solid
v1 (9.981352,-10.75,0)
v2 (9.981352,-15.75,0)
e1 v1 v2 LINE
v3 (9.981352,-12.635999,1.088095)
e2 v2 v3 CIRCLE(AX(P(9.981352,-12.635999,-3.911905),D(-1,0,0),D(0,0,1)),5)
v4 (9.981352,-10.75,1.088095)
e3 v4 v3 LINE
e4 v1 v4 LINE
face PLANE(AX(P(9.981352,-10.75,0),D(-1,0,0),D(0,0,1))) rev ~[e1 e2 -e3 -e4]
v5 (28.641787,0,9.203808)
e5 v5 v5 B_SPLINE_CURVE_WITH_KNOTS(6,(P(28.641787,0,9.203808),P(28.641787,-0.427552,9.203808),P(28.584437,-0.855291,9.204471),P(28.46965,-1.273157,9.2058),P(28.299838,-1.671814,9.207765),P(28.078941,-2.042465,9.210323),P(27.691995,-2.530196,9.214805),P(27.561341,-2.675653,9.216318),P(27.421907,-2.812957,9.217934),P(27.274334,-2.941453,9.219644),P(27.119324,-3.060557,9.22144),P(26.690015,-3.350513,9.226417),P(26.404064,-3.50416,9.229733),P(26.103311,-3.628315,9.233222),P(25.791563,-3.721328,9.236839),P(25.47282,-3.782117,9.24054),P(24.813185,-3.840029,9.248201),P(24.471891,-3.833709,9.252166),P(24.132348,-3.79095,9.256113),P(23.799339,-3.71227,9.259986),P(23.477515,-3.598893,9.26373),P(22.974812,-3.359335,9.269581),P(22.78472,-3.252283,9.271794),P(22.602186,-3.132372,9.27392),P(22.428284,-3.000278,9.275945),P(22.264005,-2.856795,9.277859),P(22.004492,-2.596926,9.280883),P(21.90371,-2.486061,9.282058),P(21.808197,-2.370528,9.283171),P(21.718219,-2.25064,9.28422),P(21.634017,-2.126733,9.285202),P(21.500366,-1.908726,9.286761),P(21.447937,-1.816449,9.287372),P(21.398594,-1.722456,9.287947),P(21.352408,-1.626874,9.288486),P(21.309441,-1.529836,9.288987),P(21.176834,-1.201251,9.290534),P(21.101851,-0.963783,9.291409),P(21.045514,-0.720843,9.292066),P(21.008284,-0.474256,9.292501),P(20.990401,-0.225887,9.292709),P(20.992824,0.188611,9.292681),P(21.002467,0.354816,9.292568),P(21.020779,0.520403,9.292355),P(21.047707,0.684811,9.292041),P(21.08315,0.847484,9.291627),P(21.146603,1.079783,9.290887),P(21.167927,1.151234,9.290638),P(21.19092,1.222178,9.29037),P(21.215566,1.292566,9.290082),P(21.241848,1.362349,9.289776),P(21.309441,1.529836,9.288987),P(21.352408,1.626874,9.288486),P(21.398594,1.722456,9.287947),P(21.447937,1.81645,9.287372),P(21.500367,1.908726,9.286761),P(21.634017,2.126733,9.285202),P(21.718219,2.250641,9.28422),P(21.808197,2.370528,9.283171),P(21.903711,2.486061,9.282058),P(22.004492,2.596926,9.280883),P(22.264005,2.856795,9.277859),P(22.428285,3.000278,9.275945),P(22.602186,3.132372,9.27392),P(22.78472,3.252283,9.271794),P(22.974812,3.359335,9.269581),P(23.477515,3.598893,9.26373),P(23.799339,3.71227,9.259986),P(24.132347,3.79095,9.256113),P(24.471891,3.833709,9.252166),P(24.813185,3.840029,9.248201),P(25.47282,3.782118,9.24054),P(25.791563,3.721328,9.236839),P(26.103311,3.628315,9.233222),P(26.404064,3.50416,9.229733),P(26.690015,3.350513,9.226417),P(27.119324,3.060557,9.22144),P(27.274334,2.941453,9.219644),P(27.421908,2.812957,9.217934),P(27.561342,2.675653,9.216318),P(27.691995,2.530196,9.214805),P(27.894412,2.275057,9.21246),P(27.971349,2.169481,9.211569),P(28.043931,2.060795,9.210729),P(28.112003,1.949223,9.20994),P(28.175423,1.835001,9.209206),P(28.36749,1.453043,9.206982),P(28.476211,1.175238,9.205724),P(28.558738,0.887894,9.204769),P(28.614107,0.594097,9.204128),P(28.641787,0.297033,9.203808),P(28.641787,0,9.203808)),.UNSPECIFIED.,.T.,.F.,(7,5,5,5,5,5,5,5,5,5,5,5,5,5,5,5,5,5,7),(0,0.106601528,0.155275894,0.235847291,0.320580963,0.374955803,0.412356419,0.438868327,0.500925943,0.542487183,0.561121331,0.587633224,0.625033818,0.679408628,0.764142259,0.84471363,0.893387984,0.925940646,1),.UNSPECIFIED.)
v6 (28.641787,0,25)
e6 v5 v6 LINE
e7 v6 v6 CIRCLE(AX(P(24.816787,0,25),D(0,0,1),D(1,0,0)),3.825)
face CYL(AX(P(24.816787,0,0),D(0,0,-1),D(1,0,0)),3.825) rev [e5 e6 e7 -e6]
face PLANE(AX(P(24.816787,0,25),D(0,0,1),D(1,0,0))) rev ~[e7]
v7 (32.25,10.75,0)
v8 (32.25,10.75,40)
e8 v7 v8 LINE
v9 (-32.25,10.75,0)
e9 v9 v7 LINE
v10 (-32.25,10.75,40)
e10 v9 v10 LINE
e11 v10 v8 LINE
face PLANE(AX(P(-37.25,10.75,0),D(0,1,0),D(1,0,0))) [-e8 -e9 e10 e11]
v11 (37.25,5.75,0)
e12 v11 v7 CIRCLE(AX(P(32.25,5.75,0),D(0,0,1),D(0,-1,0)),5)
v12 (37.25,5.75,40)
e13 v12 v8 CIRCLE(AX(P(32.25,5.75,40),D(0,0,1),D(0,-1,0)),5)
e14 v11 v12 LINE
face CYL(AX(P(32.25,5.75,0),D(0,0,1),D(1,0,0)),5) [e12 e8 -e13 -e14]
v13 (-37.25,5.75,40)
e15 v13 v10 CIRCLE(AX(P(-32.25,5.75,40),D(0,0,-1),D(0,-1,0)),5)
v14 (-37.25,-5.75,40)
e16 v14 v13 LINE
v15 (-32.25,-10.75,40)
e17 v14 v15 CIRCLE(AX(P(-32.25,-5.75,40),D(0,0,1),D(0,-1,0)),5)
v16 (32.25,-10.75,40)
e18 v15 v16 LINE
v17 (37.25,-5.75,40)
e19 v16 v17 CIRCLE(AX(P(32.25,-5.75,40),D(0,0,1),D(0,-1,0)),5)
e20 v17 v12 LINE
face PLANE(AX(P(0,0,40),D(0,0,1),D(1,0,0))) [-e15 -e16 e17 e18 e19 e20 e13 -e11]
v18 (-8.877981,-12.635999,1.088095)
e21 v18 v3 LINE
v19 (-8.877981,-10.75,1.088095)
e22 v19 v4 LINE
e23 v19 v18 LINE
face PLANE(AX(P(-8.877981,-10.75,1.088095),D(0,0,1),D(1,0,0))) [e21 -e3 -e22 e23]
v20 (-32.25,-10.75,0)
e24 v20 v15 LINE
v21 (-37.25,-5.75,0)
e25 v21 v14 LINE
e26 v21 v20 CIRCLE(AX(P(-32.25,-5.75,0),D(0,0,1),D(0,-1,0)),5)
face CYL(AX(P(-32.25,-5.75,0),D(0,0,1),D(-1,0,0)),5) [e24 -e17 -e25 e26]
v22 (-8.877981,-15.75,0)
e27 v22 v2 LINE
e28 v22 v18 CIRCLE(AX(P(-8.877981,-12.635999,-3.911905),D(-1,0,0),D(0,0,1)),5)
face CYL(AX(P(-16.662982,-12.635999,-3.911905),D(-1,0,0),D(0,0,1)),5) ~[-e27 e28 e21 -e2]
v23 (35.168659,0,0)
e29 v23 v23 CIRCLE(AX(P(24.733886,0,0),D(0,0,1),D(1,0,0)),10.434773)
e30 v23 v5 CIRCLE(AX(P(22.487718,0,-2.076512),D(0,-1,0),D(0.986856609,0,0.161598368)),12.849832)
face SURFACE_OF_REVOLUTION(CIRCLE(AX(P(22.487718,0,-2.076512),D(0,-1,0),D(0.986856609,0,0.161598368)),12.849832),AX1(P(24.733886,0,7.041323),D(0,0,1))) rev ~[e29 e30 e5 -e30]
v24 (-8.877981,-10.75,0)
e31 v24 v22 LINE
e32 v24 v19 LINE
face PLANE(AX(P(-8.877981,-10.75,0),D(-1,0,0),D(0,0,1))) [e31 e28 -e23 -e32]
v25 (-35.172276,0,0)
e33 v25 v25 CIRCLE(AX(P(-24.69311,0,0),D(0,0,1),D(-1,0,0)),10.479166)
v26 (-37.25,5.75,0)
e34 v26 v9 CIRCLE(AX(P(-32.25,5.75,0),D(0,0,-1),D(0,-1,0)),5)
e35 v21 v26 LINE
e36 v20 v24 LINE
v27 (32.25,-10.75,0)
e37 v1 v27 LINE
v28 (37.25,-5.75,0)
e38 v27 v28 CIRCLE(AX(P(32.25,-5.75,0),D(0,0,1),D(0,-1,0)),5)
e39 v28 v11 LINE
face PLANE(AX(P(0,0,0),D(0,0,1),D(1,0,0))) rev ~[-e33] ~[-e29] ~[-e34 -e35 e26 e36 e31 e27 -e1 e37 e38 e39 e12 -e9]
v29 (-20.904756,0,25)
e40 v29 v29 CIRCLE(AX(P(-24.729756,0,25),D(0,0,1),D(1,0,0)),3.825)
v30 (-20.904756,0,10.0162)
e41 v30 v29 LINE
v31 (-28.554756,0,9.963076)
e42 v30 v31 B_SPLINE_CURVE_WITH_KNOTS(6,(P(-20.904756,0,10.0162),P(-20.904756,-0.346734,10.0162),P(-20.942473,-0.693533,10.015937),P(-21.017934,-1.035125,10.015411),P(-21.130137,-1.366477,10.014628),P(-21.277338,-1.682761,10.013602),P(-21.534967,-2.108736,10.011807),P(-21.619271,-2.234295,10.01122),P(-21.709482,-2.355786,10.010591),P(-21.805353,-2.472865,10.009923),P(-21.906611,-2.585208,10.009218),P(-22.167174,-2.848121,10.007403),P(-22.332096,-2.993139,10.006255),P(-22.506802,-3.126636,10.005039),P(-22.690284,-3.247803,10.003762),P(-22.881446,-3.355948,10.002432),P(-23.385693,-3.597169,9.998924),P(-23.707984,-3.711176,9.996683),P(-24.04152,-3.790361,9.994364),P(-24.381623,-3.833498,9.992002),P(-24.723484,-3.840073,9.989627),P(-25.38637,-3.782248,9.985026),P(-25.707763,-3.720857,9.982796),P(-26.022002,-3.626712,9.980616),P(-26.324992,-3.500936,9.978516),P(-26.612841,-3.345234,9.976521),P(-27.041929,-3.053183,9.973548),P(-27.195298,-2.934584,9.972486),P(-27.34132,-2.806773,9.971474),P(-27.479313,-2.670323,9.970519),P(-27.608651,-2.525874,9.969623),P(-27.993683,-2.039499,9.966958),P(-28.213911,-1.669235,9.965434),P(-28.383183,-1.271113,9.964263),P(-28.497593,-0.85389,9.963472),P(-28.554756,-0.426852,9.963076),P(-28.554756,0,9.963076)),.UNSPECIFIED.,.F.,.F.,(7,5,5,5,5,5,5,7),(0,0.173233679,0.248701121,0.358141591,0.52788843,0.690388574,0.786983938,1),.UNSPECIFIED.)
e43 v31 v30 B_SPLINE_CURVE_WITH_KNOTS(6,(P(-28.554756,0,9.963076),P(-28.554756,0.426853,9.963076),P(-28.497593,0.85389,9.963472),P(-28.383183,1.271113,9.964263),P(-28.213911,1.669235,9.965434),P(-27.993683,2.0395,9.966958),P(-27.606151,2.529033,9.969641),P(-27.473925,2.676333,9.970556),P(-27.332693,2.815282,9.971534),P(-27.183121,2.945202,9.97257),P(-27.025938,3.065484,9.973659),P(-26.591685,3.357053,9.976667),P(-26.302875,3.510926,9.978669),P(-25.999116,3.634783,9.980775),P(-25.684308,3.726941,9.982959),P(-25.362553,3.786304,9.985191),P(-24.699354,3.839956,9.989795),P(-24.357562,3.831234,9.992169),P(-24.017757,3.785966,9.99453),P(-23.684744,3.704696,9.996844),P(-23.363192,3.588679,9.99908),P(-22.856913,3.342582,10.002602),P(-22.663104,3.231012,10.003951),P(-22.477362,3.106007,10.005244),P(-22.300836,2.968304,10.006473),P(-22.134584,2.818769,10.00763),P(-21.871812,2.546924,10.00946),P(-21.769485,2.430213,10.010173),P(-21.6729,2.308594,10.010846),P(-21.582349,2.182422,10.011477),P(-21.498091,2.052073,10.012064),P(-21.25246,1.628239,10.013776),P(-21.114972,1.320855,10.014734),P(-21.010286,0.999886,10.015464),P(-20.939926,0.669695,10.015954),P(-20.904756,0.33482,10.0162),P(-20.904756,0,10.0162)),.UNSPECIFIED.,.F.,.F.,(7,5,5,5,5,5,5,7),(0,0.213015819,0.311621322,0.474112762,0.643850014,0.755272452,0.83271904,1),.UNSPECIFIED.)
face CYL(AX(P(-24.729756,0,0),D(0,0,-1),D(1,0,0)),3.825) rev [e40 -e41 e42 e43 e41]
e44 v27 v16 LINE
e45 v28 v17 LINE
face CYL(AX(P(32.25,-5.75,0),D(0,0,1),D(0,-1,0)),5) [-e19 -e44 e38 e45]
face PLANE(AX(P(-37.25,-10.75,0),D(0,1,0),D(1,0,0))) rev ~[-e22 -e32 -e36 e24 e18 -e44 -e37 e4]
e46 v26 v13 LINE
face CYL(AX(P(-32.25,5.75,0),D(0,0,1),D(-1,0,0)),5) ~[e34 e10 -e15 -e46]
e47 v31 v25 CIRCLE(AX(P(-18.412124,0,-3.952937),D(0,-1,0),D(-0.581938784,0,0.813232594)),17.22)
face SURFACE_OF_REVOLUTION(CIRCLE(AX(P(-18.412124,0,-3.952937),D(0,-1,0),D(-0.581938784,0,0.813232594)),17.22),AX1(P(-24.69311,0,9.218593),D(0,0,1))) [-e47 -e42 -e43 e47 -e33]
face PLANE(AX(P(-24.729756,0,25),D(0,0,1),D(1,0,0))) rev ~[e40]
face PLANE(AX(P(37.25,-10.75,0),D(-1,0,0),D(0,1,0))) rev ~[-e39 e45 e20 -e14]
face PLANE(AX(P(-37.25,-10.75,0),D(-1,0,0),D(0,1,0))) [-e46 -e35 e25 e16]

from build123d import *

# Parameters (mm, degrees)
F0_W        = 74.5
F0_H        = 21.5
F0_R        = 10.55
F1_DEPTH    = 40
F2_R        = 5
F7_W        = 18.8593324274
F7_H        = 1.088095014
F8_DEPTH    = 5
F9_T1_DEPTH = 34.4293351412
F10_R       = 3.825
F11_DEPTH   = 25
F12_R       = 3.825
F13_DEPTH   = 25


# Not quite as in the source:
# - a fillet or chamfer that OpenCascade refuses, or shapes differently, is made with other operations: its cross-section is extruded or revolved along the edge and cut away or added


with BuildPart() as f1:
    # F0 (on Top) → F1 (new body)
    with BuildSketch(Plane.XY):
        Rectangle(F0_W, F0_H)
        with Locations((-24.6931102476, 0)):
            Circle(F0_R, mode=Mode.SUBTRACT)
        with BuildLine():
            ThreePointArc((35.3068897524, 0), (24.7568897524, -10.55), (14.2068897524, 0))
            ThreePointArc((14.2068897524, 0), (24.7568897524, 10.55), (35.3068897524, 0))
        make_face(mode=Mode.SUBTRACT)
        with Locations((-24.6931102476, 0)):
            Circle(F0_R)
        with BuildLine():
            ThreePointArc((35.3068897524, 0), (24.7568897524, 10.55), (14.2068897524, 0))
            ThreePointArc((14.2068897524, 0), (24.7568897524, -10.55), (35.3068897524, 0))
        make_face()
    extrude(amount=F1_DEPTH)

    # F2
    f2_edges = [f1.edges().sort_by_distance(p)[0] for p in [
        (-37.25, -10.75, 20),
        (37.25, -10.75, 20),
        (-37.25, 10.75, 20),
        (37.25, 10.75, 20),
    ]]
    fillet(f2_edges, radius=F2_R)

    # F3 (on Front) → F4 (revolve, cut)
    with BuildSketch(Plane.XZ):
        with BuildLine():
            Line((-35.1722761989, 0), (-28.4331102476, 0))
            Line((-28.4331102476, 0), (-28.4331102476, 10.0509282202))
            ThreePointArc((-28.4331102476, 10.0509282202), (-32.7146634372, 5.6369418244), (-35.1722761989, 0))
        make_face()
    revolve(axis=Axis((-24.6931102476, 0, 9.2185929652), (0, 0, 1)), mode=Mode.SUBTRACT)

    # F5 (on Front) → F6 (revolve, cut)
    with BuildSketch(Plane.XZ):
        with BuildLine():
            Line((28.4479595721, 9.307410568), (28.4479595721, 0))
            Line((28.4479595721, 0), (35.168658942, 0))
            ThreePointArc((35.168658942, 0), (32.9055101663, 5.445972629), (28.4479595721, 9.307410568))
        make_face()
    revolve(axis=Axis((24.7338861227, 0, 7.0413234644), (0, 0, 1)), mode=Mode.SUBTRACT)

    # F7 (on face) → F8 (join)
    with BuildSketch(Plane.XZ.offset(10.75)):
        with Locations((0.5516856909, 0.544047507)):
            Rectangle(F7_W, F7_H)
    extrude(amount=F8_DEPTH)

    # F9: fillet of radius 5 on 1 edges, made by hand

    # F9_s2 → F9_t1 (cut)
    with BuildSketch(Plane.YZ.offset(-16.6629818797)):
        with BuildLine():
            ThreePointArc((-12.6359994572, 1.088095014), (-14.2853137193, 0.8082393407), (-15.75, 0))
            Line((-15.75, 0), (-15.75, 1.088095014))
            Line((-15.75, 1.088095014), (-12.6359994572, 1.088095014))
        make_face()
    extrude(amount=F9_T1_DEPTH, mode=Mode.SUBTRACT)

    # F10 (on Top) → F11 (cut)
    with BuildSketch(Plane.XY):
        with Locations((-24.7297555931, 0)):
            Circle(F10_R)
    extrude(amount=F11_DEPTH, mode=Mode.SUBTRACT)

    # F12 (on Top) → F13 (cut)
    with BuildSketch(Plane.XY):
        with Locations((24.8167866624, 0)):
            Circle(F12_R)
    extrude(amount=F13_DEPTH, mode=Mode.SUBTRACT)


solid = f1.part
